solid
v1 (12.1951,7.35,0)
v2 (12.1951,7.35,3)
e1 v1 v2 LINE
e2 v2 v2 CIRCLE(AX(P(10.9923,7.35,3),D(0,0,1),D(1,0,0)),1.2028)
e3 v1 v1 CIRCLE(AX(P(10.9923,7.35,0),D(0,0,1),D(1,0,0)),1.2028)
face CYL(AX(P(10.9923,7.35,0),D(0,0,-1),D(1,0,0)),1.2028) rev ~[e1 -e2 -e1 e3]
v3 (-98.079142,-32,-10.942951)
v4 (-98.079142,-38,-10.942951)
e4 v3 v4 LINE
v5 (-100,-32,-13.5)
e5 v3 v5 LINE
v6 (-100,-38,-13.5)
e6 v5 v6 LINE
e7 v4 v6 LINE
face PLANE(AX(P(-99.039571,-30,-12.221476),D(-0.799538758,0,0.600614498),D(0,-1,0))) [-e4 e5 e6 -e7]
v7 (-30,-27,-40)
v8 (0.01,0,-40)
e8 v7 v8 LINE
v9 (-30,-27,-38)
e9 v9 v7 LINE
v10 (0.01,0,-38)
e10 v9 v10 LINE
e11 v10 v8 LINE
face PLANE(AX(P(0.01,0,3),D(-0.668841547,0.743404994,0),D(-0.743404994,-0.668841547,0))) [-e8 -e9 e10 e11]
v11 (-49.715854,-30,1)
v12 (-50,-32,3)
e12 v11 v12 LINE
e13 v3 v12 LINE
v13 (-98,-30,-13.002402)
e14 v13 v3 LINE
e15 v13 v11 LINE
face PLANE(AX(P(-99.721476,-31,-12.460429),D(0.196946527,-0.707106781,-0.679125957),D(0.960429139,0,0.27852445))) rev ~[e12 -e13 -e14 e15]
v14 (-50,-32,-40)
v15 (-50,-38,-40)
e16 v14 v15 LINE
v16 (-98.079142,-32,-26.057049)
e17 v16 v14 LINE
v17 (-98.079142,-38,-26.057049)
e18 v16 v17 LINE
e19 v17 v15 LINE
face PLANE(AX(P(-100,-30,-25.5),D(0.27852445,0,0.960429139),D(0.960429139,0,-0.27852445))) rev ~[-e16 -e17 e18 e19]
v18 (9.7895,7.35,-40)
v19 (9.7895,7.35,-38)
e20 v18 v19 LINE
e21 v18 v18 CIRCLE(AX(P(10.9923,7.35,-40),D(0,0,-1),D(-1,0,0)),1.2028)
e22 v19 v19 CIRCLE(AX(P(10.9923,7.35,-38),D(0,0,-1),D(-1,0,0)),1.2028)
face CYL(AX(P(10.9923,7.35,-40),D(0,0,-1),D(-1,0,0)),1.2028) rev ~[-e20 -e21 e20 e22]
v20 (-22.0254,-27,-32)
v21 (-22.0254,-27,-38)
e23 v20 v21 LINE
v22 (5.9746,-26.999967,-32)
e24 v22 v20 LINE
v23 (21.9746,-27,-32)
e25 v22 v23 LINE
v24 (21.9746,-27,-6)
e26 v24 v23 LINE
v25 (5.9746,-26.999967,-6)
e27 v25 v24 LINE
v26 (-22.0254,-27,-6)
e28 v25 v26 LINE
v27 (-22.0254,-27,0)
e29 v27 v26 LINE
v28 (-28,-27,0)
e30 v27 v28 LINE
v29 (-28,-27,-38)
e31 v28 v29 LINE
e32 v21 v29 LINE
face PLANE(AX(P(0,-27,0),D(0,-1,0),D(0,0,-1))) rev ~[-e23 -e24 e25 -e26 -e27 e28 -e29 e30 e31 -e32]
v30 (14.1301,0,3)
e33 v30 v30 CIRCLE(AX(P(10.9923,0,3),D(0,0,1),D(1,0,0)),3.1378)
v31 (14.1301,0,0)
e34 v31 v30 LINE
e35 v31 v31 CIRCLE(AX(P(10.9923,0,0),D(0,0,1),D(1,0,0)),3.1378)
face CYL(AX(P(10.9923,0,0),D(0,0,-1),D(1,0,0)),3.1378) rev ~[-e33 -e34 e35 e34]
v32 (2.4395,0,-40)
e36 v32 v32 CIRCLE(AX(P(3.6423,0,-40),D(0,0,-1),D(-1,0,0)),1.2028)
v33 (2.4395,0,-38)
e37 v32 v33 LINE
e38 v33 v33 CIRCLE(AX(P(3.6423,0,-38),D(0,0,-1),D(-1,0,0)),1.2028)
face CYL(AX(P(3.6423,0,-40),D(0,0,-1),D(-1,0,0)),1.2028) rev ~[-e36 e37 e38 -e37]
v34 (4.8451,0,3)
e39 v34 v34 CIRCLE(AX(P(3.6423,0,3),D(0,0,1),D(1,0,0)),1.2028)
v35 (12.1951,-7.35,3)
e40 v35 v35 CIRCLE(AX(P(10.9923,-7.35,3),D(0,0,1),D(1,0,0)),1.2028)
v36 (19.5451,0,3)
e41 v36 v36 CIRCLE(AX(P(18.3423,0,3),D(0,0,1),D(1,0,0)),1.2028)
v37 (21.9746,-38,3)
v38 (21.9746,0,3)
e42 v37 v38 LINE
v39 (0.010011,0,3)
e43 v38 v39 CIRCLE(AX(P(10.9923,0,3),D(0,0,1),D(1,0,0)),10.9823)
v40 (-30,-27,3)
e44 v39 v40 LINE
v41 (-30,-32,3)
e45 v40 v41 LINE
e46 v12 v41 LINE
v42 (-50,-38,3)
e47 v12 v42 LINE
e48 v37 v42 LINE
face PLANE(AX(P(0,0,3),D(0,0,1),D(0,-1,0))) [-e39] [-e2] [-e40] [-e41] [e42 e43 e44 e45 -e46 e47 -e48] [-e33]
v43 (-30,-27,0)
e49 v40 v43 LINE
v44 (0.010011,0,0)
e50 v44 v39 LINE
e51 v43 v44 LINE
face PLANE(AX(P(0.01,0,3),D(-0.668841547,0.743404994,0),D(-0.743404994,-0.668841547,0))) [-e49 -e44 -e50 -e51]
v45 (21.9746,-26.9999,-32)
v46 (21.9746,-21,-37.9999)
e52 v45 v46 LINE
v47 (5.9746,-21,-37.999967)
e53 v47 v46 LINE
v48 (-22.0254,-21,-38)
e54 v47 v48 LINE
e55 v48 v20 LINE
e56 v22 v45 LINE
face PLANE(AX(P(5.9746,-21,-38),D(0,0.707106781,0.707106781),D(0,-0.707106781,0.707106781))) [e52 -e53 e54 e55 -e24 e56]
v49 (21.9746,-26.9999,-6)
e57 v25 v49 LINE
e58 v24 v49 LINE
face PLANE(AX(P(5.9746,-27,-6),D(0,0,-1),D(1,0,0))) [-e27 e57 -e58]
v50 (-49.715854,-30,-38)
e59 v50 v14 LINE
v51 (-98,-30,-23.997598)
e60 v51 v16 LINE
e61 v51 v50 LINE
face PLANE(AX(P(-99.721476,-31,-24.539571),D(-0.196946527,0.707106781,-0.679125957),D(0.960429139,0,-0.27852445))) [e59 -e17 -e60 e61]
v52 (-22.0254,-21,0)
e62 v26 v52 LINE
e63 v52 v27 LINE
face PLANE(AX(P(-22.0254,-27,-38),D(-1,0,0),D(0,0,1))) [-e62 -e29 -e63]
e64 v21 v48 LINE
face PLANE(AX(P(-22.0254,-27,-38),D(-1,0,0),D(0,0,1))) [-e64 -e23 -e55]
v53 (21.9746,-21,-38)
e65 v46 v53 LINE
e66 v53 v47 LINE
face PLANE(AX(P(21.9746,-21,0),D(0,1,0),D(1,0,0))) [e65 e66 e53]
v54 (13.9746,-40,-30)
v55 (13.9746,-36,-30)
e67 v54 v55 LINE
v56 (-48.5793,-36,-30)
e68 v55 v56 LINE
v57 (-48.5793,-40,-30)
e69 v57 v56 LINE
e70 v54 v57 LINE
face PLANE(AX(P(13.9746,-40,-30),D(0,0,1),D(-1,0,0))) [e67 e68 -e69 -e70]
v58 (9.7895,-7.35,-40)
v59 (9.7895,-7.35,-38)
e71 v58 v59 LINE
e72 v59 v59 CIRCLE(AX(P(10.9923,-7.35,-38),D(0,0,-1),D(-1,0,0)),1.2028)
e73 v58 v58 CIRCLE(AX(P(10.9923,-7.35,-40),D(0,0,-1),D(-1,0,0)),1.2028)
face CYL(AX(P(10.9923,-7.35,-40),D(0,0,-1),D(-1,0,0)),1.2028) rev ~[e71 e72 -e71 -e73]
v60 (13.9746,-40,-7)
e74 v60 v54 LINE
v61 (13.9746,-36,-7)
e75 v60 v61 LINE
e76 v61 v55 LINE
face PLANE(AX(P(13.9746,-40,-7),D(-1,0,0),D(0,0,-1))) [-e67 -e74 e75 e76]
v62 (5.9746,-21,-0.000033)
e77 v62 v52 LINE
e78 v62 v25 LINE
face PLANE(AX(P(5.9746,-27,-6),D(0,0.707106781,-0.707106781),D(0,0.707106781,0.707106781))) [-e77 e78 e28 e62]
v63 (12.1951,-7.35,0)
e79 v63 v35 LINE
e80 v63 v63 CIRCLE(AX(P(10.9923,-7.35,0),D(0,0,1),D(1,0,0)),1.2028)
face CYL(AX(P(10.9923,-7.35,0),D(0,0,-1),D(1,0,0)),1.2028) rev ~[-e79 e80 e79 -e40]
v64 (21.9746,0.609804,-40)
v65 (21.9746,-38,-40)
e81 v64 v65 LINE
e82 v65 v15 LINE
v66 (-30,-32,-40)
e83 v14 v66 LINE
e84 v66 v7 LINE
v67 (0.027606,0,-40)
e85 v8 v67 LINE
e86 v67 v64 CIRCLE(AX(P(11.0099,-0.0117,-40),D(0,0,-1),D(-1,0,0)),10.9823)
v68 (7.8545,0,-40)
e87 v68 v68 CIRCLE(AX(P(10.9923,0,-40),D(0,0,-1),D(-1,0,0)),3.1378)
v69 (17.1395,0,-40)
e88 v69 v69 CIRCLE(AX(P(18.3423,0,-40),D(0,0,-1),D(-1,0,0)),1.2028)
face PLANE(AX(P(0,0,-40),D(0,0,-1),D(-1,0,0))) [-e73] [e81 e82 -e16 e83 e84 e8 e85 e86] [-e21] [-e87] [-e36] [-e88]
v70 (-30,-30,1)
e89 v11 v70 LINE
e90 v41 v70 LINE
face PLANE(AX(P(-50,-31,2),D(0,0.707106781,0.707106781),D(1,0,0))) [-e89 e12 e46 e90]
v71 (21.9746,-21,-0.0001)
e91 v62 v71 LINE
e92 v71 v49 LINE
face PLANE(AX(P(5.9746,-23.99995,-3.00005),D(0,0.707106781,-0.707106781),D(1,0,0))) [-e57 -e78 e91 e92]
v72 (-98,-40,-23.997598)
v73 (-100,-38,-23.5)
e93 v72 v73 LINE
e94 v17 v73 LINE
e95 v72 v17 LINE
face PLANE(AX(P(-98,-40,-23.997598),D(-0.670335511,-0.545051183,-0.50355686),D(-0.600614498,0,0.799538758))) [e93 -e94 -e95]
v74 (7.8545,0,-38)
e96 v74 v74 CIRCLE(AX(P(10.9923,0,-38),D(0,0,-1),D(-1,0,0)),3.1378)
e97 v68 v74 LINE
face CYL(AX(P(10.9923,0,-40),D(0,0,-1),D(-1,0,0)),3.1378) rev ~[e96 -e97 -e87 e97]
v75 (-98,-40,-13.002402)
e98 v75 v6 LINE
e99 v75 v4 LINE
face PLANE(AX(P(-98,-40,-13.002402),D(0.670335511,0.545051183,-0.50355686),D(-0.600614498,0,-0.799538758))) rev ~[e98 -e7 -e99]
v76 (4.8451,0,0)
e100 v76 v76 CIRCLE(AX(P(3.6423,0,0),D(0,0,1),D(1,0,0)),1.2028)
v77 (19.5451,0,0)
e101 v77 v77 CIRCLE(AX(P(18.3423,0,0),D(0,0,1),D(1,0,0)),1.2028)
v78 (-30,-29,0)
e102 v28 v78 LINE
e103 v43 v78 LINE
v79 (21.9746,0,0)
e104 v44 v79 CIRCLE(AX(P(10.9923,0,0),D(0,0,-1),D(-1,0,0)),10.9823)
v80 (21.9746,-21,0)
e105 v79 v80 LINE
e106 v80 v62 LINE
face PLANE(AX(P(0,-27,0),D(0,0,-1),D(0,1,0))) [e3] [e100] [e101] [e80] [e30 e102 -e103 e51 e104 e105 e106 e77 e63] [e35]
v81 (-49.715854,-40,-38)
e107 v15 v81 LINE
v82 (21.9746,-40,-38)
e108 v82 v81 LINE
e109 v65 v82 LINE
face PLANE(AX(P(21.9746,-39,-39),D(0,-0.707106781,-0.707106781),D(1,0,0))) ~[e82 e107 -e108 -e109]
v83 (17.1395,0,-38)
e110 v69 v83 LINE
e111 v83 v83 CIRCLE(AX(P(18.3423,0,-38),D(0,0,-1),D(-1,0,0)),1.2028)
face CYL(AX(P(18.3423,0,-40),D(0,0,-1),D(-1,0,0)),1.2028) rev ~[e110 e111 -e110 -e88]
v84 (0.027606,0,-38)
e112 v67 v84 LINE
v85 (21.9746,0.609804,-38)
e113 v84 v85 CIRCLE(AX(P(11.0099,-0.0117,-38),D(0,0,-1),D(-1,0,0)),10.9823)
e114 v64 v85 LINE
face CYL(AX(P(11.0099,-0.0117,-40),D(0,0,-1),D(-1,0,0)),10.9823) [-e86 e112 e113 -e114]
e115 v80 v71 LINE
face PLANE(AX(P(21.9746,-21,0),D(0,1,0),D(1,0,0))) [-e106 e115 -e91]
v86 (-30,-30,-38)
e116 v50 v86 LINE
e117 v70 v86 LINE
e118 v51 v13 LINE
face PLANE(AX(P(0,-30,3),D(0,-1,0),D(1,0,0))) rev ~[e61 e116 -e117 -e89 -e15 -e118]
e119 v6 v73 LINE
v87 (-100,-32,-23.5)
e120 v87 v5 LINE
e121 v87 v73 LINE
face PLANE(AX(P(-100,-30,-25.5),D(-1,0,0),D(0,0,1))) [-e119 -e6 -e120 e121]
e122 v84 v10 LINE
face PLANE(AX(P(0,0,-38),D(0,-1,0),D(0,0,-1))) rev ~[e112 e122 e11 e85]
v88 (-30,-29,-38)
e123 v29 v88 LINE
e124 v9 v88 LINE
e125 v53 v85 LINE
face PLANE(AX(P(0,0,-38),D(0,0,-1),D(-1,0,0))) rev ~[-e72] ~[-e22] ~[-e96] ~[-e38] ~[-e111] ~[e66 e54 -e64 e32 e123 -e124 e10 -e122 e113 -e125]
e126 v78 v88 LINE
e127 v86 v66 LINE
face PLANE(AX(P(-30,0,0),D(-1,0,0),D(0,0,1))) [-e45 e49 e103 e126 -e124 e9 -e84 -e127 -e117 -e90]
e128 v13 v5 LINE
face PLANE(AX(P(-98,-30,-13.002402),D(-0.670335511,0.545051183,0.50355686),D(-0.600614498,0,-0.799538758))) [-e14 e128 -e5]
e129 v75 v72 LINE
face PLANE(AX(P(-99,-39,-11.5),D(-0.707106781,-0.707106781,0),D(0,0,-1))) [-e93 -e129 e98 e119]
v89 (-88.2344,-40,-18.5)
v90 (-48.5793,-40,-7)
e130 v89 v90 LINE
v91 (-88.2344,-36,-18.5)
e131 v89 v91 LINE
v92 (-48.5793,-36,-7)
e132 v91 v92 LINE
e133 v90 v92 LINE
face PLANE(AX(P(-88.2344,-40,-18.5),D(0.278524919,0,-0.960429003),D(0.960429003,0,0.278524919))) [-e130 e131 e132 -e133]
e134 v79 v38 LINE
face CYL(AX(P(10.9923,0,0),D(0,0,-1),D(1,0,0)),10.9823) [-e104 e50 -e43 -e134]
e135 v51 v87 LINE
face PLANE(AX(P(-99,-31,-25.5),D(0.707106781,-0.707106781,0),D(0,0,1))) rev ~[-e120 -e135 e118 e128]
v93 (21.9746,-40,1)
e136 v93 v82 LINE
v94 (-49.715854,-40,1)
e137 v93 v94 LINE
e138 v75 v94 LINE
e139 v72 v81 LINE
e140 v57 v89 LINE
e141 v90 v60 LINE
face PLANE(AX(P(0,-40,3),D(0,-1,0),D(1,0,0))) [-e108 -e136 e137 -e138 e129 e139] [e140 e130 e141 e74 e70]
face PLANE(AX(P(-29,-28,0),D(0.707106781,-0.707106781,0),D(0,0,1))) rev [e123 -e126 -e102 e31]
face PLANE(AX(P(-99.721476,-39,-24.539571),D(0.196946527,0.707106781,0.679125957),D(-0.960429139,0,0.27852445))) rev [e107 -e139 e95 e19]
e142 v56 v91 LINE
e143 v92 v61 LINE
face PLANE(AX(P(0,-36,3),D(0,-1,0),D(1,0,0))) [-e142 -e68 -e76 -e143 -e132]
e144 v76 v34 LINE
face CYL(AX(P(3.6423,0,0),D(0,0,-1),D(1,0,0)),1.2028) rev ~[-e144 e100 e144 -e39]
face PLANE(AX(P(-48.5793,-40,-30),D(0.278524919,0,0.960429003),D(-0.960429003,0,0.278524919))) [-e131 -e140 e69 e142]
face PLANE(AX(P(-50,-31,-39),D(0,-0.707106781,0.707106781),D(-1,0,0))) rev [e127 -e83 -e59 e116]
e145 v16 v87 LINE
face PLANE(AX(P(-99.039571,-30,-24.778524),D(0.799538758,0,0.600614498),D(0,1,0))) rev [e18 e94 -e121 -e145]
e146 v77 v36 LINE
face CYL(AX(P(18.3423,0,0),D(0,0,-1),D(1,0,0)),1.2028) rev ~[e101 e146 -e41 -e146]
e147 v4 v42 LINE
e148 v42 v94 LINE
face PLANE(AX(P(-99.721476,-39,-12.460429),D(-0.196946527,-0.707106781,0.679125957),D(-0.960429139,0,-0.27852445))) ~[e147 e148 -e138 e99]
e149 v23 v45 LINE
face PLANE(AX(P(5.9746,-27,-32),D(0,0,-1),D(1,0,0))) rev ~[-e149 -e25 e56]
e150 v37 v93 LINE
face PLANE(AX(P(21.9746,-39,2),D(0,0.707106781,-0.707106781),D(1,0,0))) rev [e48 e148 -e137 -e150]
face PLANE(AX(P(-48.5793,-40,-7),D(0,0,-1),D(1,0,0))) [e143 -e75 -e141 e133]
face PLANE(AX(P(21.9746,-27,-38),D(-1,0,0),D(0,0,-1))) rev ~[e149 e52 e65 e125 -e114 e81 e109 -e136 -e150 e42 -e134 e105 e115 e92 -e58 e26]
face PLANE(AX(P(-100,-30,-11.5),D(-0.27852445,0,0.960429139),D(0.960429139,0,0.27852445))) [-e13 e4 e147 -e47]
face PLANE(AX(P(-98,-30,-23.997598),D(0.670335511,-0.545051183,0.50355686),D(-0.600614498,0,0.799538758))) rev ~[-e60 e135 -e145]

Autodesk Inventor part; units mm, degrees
ref_plane "YZ Plane" through (0, 0, 0) normal (1, 0, 0) x (0, 1, 0)
ref_plane "XZ Plane" through (0, 0, 0) normal (0, 1, 0) x (-1, 0, 0)
ref_plane "XY Plane" through (0, 0, 0) normal (0, 0, 1) x (1, 0, 0)
ref_plane "Plano de trabajo1" through (0, 0, 0) normal (0, 0, 1) x (1, 0, 0)
sketch "Boceto1" plane through (0, 0, 0) normal (0, 0, 1) x (1, 0, 0)
  circle A0 centre (10.9923, 0) radius 10.9823 projected
  circle A1 centre (10.9923, 0) radius 3.1378 projected
  circle A2 centre (18.3423, 0) radius 1.2028 projected
  circle A3 centre (10.9923, 7.35) radius 1.2028 projected
  circle A4 centre (3.6423, 0) radius 1.2028 projected
  circle A5 centre (10.9923, -7.35) radius 1.2028 projected
  line L0 (0, 0) -> (0, 30)
  line L1 (21.9746, 0) -> (21.9746, -30)
  line L2 (0, 0) -> (0, -30)
  line L3 (0, -30) -> (21.9746, -30)
  circle A6 centre (10.9923, 0) radius 3.1378
  circle A7 centre (18.3423, 0) radius 1.2028
  circle A8 centre (10.9923, -7.35) radius 1.2028
  circle A9 centre (3.6423, 0) radius 1.2028
  circle A10 centre (10.9923, 7.35) radius 1.2028
  circle A11 centre (10.9923, 0) radius 10.9823
  line L4 (0, 0) -> (0, -30)
  line L5 (0, -30) -> (21.9746, -30)
  line L6 (21.9746, -30) -> (21.9746, 0)
  dimension "d0" = 30
  dimension "d1" = 30
extrude "Extrusión1" add sketch "Boceto1" along normal blind 3
sketch "Boceto2" plane through (10.9923, 0, 3) normal (0, 0, 1) x (1, 0, 0)
  circle A0 centre (0, 0) radius 10.9823 projected
  line L0 (10.9823, 0) -> (10.9823, -30)
  line L1 (10.9823, -30) -> (-9.7118, -30)
  line L2 (-9.7118, -30) -> (-10.9923, 0)
  circle A1 centre (0, 0) radius 10.9823 projected
  circle A2 centre (0, -7.35) radius 1.2028 projected
  circle A3 centre (-7.35, 0) radius 1.2028 projected
  circle A4 centre (0, 7.35) radius 1.2028 projected
  circle A5 centre (7.35, 0) radius 1.2028 projected
  circle A6 centre (0, 0) radius 3.1378 projected
  point P0 (-10.9723, -0.4683)
  dimension "d4" = 30
extrude "Extrusión2" add sketch "Boceto2" against normal blind 3 contours L0 L1 L2 A0
sketch "Boceto3" plane through (0, 0, 0) normal (0, 0, -1) x (-1, 0, 0)
  point P0 (0, 0)
sketch "Boceto4" plane through (0, 0, 3) normal (0, 0, 1) x (1, 0, 0)
  point P0 (0, 0)
sketch "Boceto5" plane through (0, 0, 0) normal (0, 0, -1) x (-1, 0, 0)
  arc A0 (-0.02, -0.4683) -> (-21.9746, 0) centre (-10.9923, 0) ccw projected
  line L0 (-21.9746, 0) -> (-21.9746, -30) projected
  line L1 (-21.9746, -30) -> (-1.2805, -30) projected
  line L2 (-1.2805, -30) -> (-0.02, -0.4683) projected
  circle A1 centre (-10.9923, -7.35) radius 1.2028 projected
  circle A2 centre (-3.6423, 0) radius 1.2028 projected
  circle A3 centre (-10.9923, 7.35) radius 1.2028 projected
  circle A4 centre (-18.3423, 0) radius 1.2028 projected
  circle A5 centre (-10.9923, 0) radius 3.1378 projected
  line L3 (-21.9746, -30) -> (0, -30)
  line L4 (0, -30) -> (0, 0)
  line L5 (0, 0) -> (-21.9746, 0)
  line L6 (-21.9746, 0) -> (-21.9746, -30)
  point P0 (-0.01, 0)
extrude "Extrusión3" add sketch "Boceto5" against normal blind 3 contours A0 L5 L4 L3 L2
sketch "Boceto6" plane through (0, 0, 0) normal (0, 0, -1) x (-1, 0, 0)
  point P0 (0, 0)
sketch "Boceto7" plane through (0, 0, 0) normal (0, 0, -1) x (-1, 0, 0)
  line L0 (-21.9746, -30) -> (0, -30) projected
  line L1 (-21.9746, -30) -> (-21.9746, 0) projected
  line L2 (0, -30) -> (-21.9746, -30)
  line L3 (-21.9746, -30) -> (-21.9746, -27)
  line L4 (-21.9746, -27) -> (0, -27)
  line L5 (0, -27) -> (0, -30)
  point P0 (0, 0)
  dimension "d9" = 3
extrude "Extrusión4" add sketch "Boceto7" along normal blind 40
sketch "Boceto8" plane through (0, -27, 0) normal (0, 1, 0) x (1, 0, 0)
  line L0 (0, -3) -> (0, 40) projected
  line L1 (21.9746, -3) -> (21.9746, 40) projected
  line L2 (0, 40) -> (21.9746, 40)
  line L3 (21.9746, 40) -> (21.9746, 38)
  line L4 (21.9746, 38) -> (0, 38)
  line L5 (0, 38) -> (0, 40)
  point P0 (0, 0)
  point P1 (21.9746, 40)
  point P2 (0, 38)
  dimension "d12" = 2
extrude "Extrusión5" add sketch "Boceto8" along normal blind 40
sketch "Boceto9" plane through (0, 0, -40) normal (0, 0, -1) x (-1, 0, 0)
  circle A0 centre (-11.0072, -0.015) radius 2.7 projected
  circle A1 centre (-11.0099, -0.0117) radius 10.9823 projected
  circle A2 centre (-18.3423, 0) radius 1.2028 projected
  circle A3 centre (-10.9923, -7.35) radius 1.2028 projected
  circle A4 centre (-10.9923, 7.35) radius 1.2028 projected
  circle A5 centre (-3.6423, 0) radius 1.2028 projected
  line L0 (-21.9746, -30) -> (-21.9746, 13) projected
  line L1 (-21.9746, -30) -> (0, -30) projected
  line L2 (0, -30) -> (0, 13) projected
  line L3 (-21.9746, 13) -> (0, 13) projected
  line L4 (-21.5706, 0) -> (-25.972, 0)
  line L5 (-25.972, 0) -> (-25.972, 18.1609)
  line L6 (-25.972, 18.1609) -> (4.5124, 18.1609)
  line L7 (4.5124, 18.1609) -> (4.5124, 1.2028)
  line L8 (4.5124, 1.2028) -> (4.5124, 0)
  line L9 (-3.6423, 0) -> (4.822, 0)
  point P0 (0, 0)
  point P1 (-21.9746, 0.6093)
  point P2 (-0.0276, 0)
  point P3 (0, 0)
extrude "Extrusión6" cut sketch "Boceto9" against normal blind 40 contours A0 | A1 L0 L3 L2 L9 | A2 | A3 | A4 | A5
sketch "Boceto10" plane through (0, -30, 3) normal (0, -1, 0) x (1, 0, 0)
  point P0 (0, -3)
sketch "Boceto11" plane through (0, -30, 3) normal (0, -1, 0) x (1, 0, 0)
  line L0 (0.0276, -43) -> (21.9746, -43) projected
  line L1 (0, -3) -> (0, 0) projected
  line L2 (21.9746, -43) -> (0, -43)
  line L3 (0, -43) -> (0, 0)
  line L4 (0, 0) -> (21.9746, 0)
  line L5 (21.9746, 0) -> (21.9746, -43)
  line L6 (0, -43) -> (-100, -43)
  line L7 (-100, -43) -> (-100, 0)
  line L8 (-100, 0) -> (0, 0)
  line L9 (0, 0) -> (0, -43)
  line L10 (-100, 0) -> (-100, -21.5)
  line L11 (-100, -21.5) -> (-100, -14.5)
  line L12 (-100, -14.5) -> (-100, -28.5)
  line L13 (-100, -28.5) -> (-50, -43)
  line L14 (-50, -43) -> (-50, 0)
  line L15 (-100, -14.5) -> (-50, 0)
  dimension "d17" = 100
  dimension "d18" = 21.5
  dimension "d19" = 7
  dimension "d20" = 14
extrude "Extrusión7" add sketch "Boceto11" along normal blind 10 contours L2 L3 L1 L4 L5 L0 | L6 L14 L8 L1 L3 | L13 L7 L15 L14
chamfer "Chaflán1" distance 2 angle 45 12 edges at (-14.0127, -40, -40) (-75, -40, -32.75) (-75, -30, -32.75) (-25, -30, -40) (-14.0127, -40, 3) (-75, -40, -4.25) (-100, -40, -18.5) (-75, -30, -4.25) (-25, -30, 3) (-100, -30, -18.5) (-100, -35, -25.5) (-100, -35, -11.5)
sketch "Boceto12" plane through (0, -40, 3) normal (0, -1, 0) x (1, 0, 0)
  line L0 (-49.7159, -2) -> (21.9746, -2) projected
  line L1 (-98, -16.0024) -> (-49.7159, -2) projected
  line L2 (-98, -26.9976) -> (-98, -16.0024) projected
  line L3 (-49.7159, -41) -> (-98, -26.9976) projected
  line L4 (21.9746, -41) -> (-49.7159, -41) projected
  line L5 (21.9746, -41) -> (21.9746, -2) projected
  line L6 (-48.5793, -33) -> (-88.2344, -21.5)
  line L7 (-88.2344, -21.5) -> (-48.5793, -10)
  line L8 (-48.5793, -10) -> (13.9746, -10)
  line L9 (13.9746, -10) -> (13.9746, -33)
  line L10 (13.9746, -33) -> (-48.5793, -33)
  point P0 (0, -3)
  dimension "d26" = 8
extrude "Extrusión8" cut sketch "Boceto12" against normal blind 4 contours L6 L7 L8 L9 L10
sketch "Boceto13" plane through (0, 0, -40) normal (0, 0, -1) x (-1, 0, 0)
  circle A0 centre (-11.0099, -0.0117) radius 5.6 projected
  circle A1 centre (-11.0072, -0.015) radius 2.7 projected
  point P0 (0, 0)
extrude "Extrusión9" cut sketch "Boceto13" against normal blind 5
sketch "Boceto14" plane through (0, 0, 0) normal (-1, 0, 0) x (0, 0, 1)
  line L0 (0, -27) -> (-38, -27) projected
  line L1 (-38, 0) -> (-40, 0) projected
  line L2 (-40, -32) -> (-40, 0) projected
  line L3 (-38, -30) -> (-40, -32) projected
  line L4 (1, -30) -> (-38, -30) projected
  line L5 (3, -32) -> (1, -30) projected
  line L6 (3, 0) -> (3, -32) projected
  line L7 (0, 0) -> (3, 0) projected
  line L8 (0, -27) -> (0, 0) projected
  line L9 (0, -27) -> (-38, -27) projected
  line L10 (-38, -27) -> (-38, 0) projected
  point P0 (0, 0)
extrude "Extrusión10" add sketch "Boceto14" along normal blind 30
sketch "Boceto15" plane through (0, 0, 3) normal (0, 0, 1) x (1, 0, 0)
  line L0 (21.9746, -38) -> (-50, -38) projected
  line L1 (21.9746, -38) -> (21.9746, 0) projected
  arc A0 (21.9746, 0) -> (0.01, 0) centre (10.9923, 0) ccw projected
  line L2 (0.01, 0) -> (-30, 0) projected
  line L3 (-30, -32) -> (-30, 0) projected
  line L4 (-50, -32) -> (-30, -32) projected
  line L5 (-50, -32) -> (-50, -38) projected
  circle A1 centre (10.9923, -7.35) radius 1.2028 projected
  circle A2 centre (3.6423, 0) radius 1.2028 projected
  circle A3 centre (10.9923, 7.35) radius 1.2028 projected
  circle A4 centre (18.3423, 0) radius 1.2028 projected
  circle A5 centre (10.9923, 0) radius 3.1378 projected
  line L6 (21.9746, -27) -> (-30, -27) projected
  line L7 (0.01, 0) -> (-30, -27)
  point P0 (0, 0)
extrude "Extrusión11" cut sketch "Boceto15" against normal blind 100 contours L3 L2 L7
chamfer "Chaflán2" distance 2 angle 45 1 edges at (-30, -27, -19)
sketch "Boceto16" plane through (21.9746, -27, 0) normal (0, 1, 0) x (1, 0, 0)
  line L0 (-49.9746, 0) -> (-49.9746, 38) projected
  line L1 (0, 0) -> (-49.9746, 0) projected
  line L2 (0, 0) -> (0, 38) projected
  line L3 (0, 38) -> (-49.9746, 38) projected
  line L4 (0, 0) -> (-16, 0)
  line L5 (-16, 0) -> (-16, 6)
  line L6 (-16, 6) -> (0, 6)
  line L7 (0, 6) -> (0, 0)
  line L8 (0, 38) -> (-16, 38)
  line L9 (-16, 38) -> (-16, 32)
  line L10 (-16, 32) -> (0, 32)
  line L11 (0, 32) -> (0, 38)
  point P0 (-21.9746, 0)
  dimension "d38" = 16
  dimension "d39" = 6
  dimension "d40" = 16
  dimension "d41" = 6
extrude "Extrusión12" add sketch "Boceto16" along normal blind 6 contours L5 L6 L2 L1 | L3 L2 L10 L9
chamfer "Chaflán3" distance 6 angle 45 2 edges at (13.9746, -21, -6) (13.9746, -21, -32)
sketch "Boceto17" plane through (5.9746, -27, -38) normal (-1, 0, 0) x (0, 0, 1)
  line L0 (0, 6) -> (6, 0) projected
  line L1 (0, 0) -> (0, 6) projected
  line L2 (6, 0) -> (0, 0) projected
  line L3 (32, 0) -> (38, 6) projected
  line L4 (38, 0) -> (32, 0) projected
  line L5 (38, 6) -> (38, 0) projected
  point P0 (38, 27)
extrude "Extrusión13" add sketch "Boceto17" along normal blind 28
sketch "Boceto18" plane through (0, 0, -40) normal (0, 0, -1) x (-1, 0, 0)
  circle A0 centre (-10.9923, 0) radius 3.1378 projected
  circle A1 centre (-11.0099, -0.0117) radius 5.6 projected
  point P0 (0, 0)
extrude "Extrusión14" add sketch "Boceto18" against normal blind 2
properties part number "tibia"
